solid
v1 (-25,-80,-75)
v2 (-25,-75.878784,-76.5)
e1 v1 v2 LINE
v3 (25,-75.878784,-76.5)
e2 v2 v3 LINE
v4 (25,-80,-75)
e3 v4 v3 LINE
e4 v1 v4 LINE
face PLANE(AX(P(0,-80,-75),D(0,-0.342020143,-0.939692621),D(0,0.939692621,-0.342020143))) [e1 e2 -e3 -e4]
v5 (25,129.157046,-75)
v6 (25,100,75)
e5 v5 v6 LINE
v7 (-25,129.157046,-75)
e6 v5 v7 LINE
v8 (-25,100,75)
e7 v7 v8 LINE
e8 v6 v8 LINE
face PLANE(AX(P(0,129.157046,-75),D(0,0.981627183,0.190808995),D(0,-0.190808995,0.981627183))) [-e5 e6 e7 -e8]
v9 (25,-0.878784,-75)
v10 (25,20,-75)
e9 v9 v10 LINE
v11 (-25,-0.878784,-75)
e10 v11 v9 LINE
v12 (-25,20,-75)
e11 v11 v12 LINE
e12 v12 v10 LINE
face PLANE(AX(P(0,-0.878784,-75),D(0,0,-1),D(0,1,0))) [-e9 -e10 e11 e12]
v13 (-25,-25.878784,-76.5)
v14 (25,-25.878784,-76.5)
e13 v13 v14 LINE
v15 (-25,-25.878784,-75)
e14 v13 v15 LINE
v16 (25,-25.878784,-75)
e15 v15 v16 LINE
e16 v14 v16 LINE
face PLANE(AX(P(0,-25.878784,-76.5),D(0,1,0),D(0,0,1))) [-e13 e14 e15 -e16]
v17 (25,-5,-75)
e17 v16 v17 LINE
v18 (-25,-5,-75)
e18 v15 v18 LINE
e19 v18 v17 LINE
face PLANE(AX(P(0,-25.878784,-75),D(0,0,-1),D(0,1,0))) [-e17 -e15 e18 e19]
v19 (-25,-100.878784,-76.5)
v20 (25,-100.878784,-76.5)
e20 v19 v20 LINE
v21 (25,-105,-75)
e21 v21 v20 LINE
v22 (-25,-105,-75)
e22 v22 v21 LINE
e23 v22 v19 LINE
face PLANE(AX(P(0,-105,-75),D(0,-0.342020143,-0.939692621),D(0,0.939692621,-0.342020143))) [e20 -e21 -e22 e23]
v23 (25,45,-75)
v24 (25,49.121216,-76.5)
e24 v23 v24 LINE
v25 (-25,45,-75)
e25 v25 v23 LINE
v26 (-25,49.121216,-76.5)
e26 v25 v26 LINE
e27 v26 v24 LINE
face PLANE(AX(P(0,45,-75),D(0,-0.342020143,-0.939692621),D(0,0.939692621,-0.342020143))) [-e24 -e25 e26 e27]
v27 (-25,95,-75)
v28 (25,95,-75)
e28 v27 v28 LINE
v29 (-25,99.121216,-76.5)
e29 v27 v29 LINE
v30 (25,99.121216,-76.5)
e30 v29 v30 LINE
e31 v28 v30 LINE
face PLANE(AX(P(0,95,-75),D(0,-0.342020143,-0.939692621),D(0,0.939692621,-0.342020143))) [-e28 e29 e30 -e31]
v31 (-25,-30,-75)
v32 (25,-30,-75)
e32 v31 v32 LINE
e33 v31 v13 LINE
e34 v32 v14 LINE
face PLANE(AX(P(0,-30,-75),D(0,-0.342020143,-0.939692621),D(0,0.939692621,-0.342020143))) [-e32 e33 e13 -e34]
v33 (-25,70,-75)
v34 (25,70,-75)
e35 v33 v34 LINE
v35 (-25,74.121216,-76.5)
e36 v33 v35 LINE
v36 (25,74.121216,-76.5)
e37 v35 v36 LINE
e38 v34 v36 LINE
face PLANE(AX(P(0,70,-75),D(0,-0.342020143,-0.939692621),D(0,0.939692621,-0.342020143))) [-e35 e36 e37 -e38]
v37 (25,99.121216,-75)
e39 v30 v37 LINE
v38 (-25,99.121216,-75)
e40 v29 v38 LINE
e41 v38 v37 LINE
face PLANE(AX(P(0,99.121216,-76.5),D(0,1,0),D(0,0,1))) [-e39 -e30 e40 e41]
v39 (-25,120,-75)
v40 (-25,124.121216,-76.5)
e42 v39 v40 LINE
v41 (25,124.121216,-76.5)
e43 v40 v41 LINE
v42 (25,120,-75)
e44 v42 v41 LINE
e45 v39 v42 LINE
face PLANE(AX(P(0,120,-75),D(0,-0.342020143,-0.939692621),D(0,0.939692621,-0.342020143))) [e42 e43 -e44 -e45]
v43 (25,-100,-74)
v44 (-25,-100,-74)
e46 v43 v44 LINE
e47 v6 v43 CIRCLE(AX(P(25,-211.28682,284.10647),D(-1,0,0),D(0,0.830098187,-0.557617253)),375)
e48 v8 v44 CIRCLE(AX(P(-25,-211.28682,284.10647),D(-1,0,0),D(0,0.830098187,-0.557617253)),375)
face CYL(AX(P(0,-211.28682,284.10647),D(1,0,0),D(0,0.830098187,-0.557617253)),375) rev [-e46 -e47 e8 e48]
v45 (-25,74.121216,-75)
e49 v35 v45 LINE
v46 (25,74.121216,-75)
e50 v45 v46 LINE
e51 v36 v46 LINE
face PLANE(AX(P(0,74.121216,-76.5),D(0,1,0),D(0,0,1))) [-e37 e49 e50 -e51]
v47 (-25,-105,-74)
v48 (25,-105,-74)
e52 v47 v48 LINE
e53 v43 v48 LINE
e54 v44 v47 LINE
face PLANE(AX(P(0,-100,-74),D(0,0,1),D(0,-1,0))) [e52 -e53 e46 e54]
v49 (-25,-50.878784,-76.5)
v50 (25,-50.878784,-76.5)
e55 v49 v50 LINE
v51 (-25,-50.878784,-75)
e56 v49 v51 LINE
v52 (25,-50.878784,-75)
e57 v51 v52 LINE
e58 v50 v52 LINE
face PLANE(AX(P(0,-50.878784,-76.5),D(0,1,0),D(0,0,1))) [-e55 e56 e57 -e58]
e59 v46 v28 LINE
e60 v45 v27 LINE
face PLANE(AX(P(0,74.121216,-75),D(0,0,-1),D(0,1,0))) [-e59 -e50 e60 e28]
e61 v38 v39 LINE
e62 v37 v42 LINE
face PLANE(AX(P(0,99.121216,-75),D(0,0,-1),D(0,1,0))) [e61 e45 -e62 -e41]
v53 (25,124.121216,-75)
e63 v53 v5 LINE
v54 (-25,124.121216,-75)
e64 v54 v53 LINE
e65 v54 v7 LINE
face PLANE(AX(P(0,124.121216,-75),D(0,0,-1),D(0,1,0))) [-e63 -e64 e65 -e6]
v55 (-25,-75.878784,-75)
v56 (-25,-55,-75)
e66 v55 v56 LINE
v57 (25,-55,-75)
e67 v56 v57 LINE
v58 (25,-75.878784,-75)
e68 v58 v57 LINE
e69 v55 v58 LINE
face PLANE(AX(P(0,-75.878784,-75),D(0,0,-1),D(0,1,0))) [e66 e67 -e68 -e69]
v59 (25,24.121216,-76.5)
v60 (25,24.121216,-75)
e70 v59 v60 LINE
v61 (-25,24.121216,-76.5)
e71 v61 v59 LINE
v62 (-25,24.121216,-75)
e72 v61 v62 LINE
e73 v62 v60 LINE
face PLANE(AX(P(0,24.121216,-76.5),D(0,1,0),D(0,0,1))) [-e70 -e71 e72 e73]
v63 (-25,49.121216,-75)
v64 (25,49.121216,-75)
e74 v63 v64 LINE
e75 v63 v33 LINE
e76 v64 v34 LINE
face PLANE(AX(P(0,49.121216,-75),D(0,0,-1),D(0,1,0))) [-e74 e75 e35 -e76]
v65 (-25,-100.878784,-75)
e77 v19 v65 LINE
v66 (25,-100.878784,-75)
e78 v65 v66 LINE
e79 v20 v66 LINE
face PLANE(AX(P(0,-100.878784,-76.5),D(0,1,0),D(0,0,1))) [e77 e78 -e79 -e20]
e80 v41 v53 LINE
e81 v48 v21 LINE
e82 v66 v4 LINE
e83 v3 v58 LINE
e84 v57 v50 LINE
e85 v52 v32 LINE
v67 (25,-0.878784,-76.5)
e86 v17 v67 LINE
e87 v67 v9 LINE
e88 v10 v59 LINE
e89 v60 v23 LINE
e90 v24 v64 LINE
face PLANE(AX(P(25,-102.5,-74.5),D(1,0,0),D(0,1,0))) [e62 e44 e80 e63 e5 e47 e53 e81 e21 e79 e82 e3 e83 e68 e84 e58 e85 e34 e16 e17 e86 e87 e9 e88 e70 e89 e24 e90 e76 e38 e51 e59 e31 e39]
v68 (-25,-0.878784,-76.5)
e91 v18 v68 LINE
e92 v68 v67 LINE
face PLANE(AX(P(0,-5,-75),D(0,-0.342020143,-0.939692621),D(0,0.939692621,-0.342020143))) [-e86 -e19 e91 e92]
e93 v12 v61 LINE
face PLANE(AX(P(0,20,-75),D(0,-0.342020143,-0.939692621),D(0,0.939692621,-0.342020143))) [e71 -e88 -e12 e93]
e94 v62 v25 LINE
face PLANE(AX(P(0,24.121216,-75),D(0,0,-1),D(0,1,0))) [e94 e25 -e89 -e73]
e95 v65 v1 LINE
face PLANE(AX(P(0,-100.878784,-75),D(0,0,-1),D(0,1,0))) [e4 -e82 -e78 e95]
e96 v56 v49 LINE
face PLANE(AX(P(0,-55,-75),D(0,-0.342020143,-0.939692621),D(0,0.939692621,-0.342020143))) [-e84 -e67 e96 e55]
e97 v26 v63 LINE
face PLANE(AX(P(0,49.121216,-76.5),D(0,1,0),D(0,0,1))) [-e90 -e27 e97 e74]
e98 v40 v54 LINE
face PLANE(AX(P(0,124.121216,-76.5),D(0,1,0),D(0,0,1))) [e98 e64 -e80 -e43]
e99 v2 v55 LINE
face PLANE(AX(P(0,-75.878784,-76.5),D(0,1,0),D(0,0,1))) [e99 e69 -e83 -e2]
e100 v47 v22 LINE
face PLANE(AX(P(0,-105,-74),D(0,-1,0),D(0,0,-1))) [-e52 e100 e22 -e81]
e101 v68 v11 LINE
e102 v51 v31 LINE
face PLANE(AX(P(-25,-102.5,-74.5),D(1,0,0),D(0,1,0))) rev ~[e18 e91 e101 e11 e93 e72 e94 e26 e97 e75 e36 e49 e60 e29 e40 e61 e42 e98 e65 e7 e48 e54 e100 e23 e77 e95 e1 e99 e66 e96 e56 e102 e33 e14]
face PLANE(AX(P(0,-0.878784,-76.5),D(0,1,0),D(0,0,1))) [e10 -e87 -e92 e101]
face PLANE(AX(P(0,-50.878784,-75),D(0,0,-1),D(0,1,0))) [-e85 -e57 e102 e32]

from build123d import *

# Parameters (mm, degrees)
F1_DEPTH = 25


with BuildPart() as f1:
    # F0 (on Right) → F1 (new body, symmetric)
    with BuildSketch(Plane.YZ):
        Polygon((-100, -75), (-100, -74), (-105, -74), (-105, -75), (-100.8787838708, -75), align=None)
        with BuildLine():
            Line((100, -75), (100, 75))
            ThreePointArc((100, 75), (12.7497178819, -16.6137152777), (-100, -74))
            Line((-100, -74), (-100, -75))
            Line((-100, -75), (-80, -75))
            Line((-80, -75), (-75.8787838708, -75))
            Line((-75.8787838708, -75), (-55, -75))
            Line((-55, -75), (-50.8787838708, -75))
            Line((-50.8787838708, -75), (-30, -75))
            Line((-30, -75), (-25.8787838708, -75))
            Line((-25.8787838708, -75), (-5, -75))
            Line((-5, -75), (-0.8787838708, -75))
            Line((-0.8787838708, -75), (20, -75))
            Line((20, -75), (24.1212161292, -75))
            Line((24.1212161292, -75), (45, -75))
            Line((45, -75), (49.1212161292, -75))
            Line((49.1212161292, -75), (70, -75))
            Line((70, -75), (74.1212161292, -75))
            Line((74.1212161292, -75), (95, -75))
            Line((95, -75), (99.1212161292, -75))
            Line((99.1212161292, -75), (100, -75))
        make_face()
        Polygon((129.1570463707, -75), (100, 75), (100, -75), (120, -75), (124.1212161292, -75), align=None)
        Polygon((-100.8787838708, -75), (-105, -75), (-100.8787838708, -76.5), align=None)
        Polygon((-75.8787838708, -75), (-80, -75), (-75.8787838708, -76.5), align=None)
        Polygon((-50.8787838708, -75), (-55, -75), (-50.8787838708, -76.5), align=None)
        Polygon((-25.8787838708, -75), (-30, -75), (-25.8787838708, -76.5), align=None)
        Polygon((-0.8787838708, -75), (-5, -75), (-0.8787838708, -76.5), align=None)
        Polygon((24.1212161292, -76.5), (24.1212161292, -75), (20, -75), align=None)
        Polygon((49.1212161292, -76.5), (49.1212161292, -75), (45, -75), align=None)
        Polygon((74.1212161292, -76.5), (74.1212161292, -75), (70, -75), align=None)
        Polygon((99.1212161292, -76.5), (99.1212161292, -75), (95, -75), align=None)
        Polygon((124.1212161292, -75), (120, -75), (124.1212161292, -76.5), align=None)
    extrude(amount=F1_DEPTH, both=True)


solid = f1.part
